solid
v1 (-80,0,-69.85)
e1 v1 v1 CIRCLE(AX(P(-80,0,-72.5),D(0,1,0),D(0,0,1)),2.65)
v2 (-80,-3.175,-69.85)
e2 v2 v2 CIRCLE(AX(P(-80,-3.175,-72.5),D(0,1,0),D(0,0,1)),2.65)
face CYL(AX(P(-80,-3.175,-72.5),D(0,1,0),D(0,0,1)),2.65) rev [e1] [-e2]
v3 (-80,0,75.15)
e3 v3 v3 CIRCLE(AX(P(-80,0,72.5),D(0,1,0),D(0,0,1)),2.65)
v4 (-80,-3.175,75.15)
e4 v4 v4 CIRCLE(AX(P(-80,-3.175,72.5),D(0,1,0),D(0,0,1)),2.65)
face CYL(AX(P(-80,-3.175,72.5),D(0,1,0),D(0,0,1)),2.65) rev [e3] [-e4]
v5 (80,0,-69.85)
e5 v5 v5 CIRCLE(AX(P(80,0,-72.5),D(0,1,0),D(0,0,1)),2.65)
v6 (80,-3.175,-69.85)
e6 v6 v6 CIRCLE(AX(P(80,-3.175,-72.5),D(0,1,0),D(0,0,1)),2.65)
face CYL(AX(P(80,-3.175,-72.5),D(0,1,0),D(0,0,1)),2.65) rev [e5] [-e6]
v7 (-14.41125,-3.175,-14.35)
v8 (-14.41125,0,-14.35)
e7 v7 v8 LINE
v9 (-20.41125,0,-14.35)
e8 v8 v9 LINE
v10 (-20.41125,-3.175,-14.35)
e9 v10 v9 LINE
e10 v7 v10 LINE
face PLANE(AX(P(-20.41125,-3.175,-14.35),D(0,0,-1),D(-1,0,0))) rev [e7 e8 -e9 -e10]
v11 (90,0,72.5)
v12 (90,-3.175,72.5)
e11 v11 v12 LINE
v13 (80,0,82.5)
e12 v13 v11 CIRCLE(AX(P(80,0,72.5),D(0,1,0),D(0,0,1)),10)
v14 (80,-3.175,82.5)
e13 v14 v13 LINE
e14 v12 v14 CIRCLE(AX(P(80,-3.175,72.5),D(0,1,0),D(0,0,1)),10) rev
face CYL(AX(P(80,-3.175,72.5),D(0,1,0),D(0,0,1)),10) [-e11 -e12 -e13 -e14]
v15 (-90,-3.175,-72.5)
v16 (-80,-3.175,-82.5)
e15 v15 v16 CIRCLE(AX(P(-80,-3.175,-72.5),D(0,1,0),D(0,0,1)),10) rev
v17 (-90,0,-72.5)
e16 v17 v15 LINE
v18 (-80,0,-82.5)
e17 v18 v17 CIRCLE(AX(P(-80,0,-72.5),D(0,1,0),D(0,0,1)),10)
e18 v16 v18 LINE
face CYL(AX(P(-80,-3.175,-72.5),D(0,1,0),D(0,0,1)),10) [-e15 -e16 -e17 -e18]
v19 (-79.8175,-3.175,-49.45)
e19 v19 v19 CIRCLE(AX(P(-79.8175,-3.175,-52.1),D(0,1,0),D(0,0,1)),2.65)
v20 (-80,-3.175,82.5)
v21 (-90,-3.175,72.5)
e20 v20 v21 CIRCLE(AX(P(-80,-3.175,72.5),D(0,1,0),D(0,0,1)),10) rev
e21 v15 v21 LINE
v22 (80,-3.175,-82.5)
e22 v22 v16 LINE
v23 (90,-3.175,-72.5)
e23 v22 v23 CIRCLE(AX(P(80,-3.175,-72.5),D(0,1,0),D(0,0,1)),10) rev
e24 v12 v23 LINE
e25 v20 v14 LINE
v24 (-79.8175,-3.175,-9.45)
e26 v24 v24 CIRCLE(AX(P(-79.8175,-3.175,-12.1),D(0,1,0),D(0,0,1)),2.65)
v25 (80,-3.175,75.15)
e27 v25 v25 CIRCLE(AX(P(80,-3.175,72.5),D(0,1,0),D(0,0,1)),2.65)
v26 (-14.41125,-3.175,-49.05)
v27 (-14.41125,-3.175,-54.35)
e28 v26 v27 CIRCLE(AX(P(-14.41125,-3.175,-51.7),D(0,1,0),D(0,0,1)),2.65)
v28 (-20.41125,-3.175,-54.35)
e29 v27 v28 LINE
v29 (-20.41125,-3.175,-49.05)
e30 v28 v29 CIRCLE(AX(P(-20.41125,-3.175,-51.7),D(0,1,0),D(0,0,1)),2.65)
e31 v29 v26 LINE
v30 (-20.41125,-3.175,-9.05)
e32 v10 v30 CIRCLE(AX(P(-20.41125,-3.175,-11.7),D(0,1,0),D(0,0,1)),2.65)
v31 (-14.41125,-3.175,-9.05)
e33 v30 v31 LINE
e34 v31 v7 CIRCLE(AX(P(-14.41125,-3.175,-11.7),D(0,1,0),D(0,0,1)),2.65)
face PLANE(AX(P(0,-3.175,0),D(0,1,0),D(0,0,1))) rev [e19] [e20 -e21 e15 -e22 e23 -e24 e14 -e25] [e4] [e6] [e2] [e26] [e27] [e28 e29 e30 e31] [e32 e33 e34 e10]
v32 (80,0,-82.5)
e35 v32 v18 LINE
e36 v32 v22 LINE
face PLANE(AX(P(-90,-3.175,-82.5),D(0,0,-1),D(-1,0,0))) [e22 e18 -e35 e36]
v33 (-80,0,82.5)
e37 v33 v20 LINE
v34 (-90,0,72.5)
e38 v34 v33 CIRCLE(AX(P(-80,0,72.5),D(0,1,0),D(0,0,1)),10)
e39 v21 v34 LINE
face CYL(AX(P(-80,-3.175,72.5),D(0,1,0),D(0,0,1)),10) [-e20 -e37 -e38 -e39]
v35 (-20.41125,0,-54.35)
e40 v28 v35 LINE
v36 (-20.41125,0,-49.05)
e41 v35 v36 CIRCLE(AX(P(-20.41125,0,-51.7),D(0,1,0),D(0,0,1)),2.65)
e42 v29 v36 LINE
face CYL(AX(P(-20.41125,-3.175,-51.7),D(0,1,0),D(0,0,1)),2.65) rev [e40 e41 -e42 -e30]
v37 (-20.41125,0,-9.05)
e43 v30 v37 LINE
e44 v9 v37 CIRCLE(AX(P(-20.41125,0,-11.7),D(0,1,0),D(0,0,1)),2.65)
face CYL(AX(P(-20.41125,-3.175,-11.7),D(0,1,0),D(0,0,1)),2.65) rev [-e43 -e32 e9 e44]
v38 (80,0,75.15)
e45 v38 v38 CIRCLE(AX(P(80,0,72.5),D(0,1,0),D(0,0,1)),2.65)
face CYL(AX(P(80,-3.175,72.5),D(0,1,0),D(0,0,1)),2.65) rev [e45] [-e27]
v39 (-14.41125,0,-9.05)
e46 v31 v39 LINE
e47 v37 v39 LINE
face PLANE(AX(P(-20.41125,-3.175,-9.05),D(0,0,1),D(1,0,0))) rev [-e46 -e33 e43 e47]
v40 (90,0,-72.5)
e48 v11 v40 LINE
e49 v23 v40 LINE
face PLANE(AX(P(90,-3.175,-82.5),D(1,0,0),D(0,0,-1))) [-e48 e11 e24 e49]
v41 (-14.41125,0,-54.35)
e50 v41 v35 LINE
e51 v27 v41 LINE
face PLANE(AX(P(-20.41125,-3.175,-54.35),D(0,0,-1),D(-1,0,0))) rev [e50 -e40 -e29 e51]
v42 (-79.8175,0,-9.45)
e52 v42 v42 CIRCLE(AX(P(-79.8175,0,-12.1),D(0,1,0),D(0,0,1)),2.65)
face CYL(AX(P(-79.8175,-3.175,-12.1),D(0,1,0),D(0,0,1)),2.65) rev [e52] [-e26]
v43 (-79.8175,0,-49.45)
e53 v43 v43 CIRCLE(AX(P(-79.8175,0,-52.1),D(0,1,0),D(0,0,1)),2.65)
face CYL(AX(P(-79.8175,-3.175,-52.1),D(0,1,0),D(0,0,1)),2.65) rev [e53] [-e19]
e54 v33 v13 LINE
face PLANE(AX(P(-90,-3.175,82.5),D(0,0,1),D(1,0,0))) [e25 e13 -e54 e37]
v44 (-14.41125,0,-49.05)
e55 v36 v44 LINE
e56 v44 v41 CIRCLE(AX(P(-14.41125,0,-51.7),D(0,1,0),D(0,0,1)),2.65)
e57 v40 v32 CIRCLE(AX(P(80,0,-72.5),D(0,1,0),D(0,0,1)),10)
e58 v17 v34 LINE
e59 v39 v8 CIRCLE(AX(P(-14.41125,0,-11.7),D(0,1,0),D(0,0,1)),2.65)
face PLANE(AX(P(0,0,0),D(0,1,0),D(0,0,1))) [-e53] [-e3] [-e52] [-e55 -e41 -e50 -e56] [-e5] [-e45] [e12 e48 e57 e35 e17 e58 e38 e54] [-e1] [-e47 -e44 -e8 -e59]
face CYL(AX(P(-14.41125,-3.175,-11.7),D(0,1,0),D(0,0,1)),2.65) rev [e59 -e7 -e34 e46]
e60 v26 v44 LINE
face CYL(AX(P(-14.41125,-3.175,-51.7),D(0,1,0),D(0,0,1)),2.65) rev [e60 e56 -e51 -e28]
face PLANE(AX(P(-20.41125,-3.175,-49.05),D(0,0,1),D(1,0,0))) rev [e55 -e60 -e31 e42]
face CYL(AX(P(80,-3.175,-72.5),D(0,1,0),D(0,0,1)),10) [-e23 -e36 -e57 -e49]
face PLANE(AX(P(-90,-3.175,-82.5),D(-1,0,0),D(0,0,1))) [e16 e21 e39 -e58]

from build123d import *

# Parameters (mm, degrees)
SKETCH1_W          = 180
SKETCH1_H          = 165
BASE_FLANGE1_DEPTH = 3.175
FILLET1_R          = 10
SKETCH2_R          = 2.65
CUT_EXTRUDE1_DEPTH = 123.132430685
SKETCH3_R          = 2.65
CUT_EXTRUDE2_DEPTH = 123.132430685


# Sheet-metal steps are written as plain solids
with BuildPart() as part:
    # Sketch1 → Base-Flange1 (new body)
    with BuildSketch(Plane(origin=(0, 0, 0), x_dir=(1, 0, 0), z_dir=(0, 1, 0))):
        Rectangle(SKETCH1_W, SKETCH1_H)
    extrude(amount=-BASE_FLANGE1_DEPTH)

    # Fillet1
    fillet1_edges = [part.edges().sort_by_distance(p)[0] for p in [
        (90, -1.5875, 82.5),
        (-90, -1.5875, 82.5),
        (-90, -1.5875, -82.5),
        (90, -1.5875, -82.5),
    ]]
    fillet(fillet1_edges, radius=FILLET1_R)

    # Sketch2 → Cut-Extrude1 (cut, through all)
    with BuildSketch(Plane(origin=(0, 0, 0), x_dir=(1, 0, 0), z_dir=(0, 1, 0))):
        with Locations(Location((-80, 72.5, 0), (0, 0, 270))):
            Circle(SKETCH2_R)
        with Locations(Location((80, 72.5, 0), (0, 0, 270))):
            Circle(SKETCH2_R)
        with Locations(Location((-80, -72.5, 0), (0, 0, 270))):
            Circle(SKETCH2_R)
        with Locations(Location((80, -72.5, 0), (0, 0, 270))):
            Circle(SKETCH2_R)
    extrude(amount=-CUT_EXTRUDE1_DEPTH, mode=Mode.SUBTRACT)

    # Sketch3 → Cut-Extrude2 (cut, through all)
    with BuildSketch(Plane(origin=(0, 0, 0), x_dir=(1, 0, 0), z_dir=(0, 1, 0))):
        with Locations(Location((-79.8175, 52.1, 0), (0, 0, 270))):
            Circle(SKETCH3_R)
        with Locations(Location((-79.8175, 12.1, 0), (0, 0, 270))):
            Circle(SKETCH3_R)
        with BuildLine():
            Line((-20.41125, 54.35), (-14.41125, 54.35))
            ThreePointArc((-14.41125, 54.35), (-11.76125, 51.7), (-14.41125, 49.05))
            Line((-14.41125, 49.05), (-20.41125, 49.05))
            ThreePointArc((-20.41125, 49.05), (-23.06125, 51.7), (-20.41125, 54.35))
        make_face()
        with BuildLine():
            Line((-20.41125, 14.35), (-14.41125, 14.35))
            ThreePointArc((-14.41125, 14.35), (-11.76125, 11.7), (-14.41125, 9.05))
            Line((-14.41125, 9.05), (-20.41125, 9.05))
            ThreePointArc((-20.41125, 9.05), (-23.06125, 11.7), (-20.41125, 14.35))
        make_face()
    extrude(amount=-CUT_EXTRUDE2_DEPTH, mode=Mode.SUBTRACT)


solid = part.part
